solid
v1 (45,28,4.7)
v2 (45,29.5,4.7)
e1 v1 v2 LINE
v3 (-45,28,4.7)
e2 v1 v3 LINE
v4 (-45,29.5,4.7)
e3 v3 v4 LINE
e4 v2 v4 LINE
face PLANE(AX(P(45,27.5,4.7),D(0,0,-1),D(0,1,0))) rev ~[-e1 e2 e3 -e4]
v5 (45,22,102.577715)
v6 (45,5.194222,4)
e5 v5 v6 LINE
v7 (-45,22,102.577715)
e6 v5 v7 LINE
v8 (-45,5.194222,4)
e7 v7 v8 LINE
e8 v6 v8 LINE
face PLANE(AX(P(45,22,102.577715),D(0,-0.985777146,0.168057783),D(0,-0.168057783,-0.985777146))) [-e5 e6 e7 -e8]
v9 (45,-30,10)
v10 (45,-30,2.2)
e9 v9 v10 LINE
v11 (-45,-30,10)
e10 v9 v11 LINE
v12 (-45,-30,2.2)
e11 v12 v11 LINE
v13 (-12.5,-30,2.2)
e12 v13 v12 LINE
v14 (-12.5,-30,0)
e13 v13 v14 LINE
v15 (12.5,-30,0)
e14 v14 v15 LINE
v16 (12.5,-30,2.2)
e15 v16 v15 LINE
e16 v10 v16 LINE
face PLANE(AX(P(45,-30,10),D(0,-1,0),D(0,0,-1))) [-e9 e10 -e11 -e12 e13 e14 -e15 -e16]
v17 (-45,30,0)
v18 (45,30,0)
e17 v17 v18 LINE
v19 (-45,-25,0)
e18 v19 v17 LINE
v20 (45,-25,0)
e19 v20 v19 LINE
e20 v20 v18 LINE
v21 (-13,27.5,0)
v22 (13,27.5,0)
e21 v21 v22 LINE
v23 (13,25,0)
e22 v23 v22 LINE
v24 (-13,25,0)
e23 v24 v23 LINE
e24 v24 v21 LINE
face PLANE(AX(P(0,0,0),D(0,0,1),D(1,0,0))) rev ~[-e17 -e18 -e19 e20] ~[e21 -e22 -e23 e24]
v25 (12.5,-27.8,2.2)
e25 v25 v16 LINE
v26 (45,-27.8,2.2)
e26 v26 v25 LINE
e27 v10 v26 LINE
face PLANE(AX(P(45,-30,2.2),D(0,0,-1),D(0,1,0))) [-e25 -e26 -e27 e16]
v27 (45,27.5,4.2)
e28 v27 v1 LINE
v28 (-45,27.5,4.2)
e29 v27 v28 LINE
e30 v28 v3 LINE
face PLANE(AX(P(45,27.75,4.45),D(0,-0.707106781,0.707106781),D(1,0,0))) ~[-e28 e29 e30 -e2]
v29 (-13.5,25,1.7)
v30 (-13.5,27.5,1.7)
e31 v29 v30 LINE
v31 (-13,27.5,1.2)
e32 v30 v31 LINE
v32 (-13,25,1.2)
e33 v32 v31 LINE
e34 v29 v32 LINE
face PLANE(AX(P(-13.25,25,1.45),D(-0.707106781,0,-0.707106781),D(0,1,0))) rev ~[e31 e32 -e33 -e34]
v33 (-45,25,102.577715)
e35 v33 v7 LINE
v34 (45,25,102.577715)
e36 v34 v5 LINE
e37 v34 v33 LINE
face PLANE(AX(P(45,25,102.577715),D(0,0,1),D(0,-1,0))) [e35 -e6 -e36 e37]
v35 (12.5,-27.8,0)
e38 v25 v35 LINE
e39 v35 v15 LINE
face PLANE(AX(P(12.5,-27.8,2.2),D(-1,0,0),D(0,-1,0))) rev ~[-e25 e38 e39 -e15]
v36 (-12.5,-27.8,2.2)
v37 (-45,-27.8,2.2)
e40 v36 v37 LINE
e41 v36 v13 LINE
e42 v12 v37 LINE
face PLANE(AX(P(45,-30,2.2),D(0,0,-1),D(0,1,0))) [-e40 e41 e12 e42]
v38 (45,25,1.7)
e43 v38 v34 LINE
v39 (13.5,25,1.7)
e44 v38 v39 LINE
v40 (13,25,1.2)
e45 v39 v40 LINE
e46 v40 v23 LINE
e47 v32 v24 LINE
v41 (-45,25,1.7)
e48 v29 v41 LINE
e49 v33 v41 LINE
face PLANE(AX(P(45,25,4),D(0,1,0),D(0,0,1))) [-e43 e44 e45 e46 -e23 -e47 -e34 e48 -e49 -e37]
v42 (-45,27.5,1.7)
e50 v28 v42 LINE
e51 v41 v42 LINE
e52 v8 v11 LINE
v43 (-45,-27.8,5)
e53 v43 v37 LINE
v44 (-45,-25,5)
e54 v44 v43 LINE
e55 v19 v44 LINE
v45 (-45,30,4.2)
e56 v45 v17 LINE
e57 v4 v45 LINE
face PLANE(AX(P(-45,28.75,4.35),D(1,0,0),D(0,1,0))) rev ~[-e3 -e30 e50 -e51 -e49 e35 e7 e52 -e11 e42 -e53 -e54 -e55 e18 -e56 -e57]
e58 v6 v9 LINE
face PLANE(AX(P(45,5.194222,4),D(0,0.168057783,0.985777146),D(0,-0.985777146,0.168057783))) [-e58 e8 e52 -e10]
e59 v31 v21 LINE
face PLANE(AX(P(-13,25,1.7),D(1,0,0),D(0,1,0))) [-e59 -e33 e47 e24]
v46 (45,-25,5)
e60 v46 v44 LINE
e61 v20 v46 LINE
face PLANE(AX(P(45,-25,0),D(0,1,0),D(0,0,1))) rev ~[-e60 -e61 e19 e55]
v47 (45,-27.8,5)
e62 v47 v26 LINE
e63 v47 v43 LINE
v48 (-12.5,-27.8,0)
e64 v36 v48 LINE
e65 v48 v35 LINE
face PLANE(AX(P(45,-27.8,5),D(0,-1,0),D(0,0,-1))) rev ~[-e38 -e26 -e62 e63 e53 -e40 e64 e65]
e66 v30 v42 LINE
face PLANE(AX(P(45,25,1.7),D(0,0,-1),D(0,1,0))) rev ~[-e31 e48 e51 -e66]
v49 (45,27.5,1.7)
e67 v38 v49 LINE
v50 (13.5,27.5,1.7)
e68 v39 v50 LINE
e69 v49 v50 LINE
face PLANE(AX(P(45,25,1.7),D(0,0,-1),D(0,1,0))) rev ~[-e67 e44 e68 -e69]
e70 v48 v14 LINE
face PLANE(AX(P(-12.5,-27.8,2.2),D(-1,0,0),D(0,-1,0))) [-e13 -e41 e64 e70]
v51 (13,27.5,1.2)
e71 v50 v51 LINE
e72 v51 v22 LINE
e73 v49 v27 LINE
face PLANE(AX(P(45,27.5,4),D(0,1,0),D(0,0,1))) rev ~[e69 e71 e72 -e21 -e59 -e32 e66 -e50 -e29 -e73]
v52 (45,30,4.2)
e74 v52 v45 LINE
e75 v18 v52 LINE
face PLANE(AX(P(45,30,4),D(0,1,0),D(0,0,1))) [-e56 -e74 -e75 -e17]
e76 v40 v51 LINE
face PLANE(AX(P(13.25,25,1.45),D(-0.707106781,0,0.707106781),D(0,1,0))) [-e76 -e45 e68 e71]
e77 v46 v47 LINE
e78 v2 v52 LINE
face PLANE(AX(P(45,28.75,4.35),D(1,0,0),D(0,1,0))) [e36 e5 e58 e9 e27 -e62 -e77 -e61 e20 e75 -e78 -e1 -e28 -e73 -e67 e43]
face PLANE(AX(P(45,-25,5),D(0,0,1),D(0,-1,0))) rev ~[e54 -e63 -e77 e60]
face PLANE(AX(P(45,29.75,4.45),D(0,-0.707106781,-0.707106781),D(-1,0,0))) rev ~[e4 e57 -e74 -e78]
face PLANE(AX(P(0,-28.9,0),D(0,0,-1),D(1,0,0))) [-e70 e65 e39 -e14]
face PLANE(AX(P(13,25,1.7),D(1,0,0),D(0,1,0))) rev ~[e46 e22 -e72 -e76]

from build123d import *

# Parameters (mm, degrees)
F0_W      = 90
F0_H      = 60
F1_DEPTH  = 4
F3_DEPTH  = 90
F4_W      = 2.2
F4_H      = 2.2
F4_W_2    = 2.5
F4_H_2    = 2.3
F5_DEPTH  = 90
F4_H_3    = 0.7
F6_DEPTH  = 90
F7_W      = 25
F7_H      = 2.2
F8_DEPTH  = 2.2
F9_W      = 26
F9_H      = 2.5
F10_DEPTH = 1.7
F11_SIZE  = 0.5


with BuildPart() as f1:
    # F0 (on Top) → F1 (new body)
    with BuildSketch(Plane.XY):
        Rectangle(F0_W, F0_H)
    extrude(amount=F1_DEPTH)

    # F2 (on face) → F3 (join, through all)
    with BuildSketch(Plane.YZ.offset(45)):
        Polygon((22, 102.5777145975), (5.1942216862, 4), (25, 4), (25, 102.5777145975), align=None)
        Polygon((-30, 10), (-30, 4), (5.1942216862, 4), align=None)
    extrude(amount=-F3_DEPTH)

    # F4 (on face) → F5 (cut, through all)
    with BuildSketch(Plane.YZ.offset(45)):
        with Locations((-28.9, 1.1)):
            Rectangle(F4_W, F4_H)
        Polygon((-27.8, 2.2), (-27.8, 0), (-25, 0), (-25, 5), (-27.8, 5), align=None)
        with Locations((26.25, 2.85)):
            Rectangle(F4_W_2, F4_H_2)
    extrude(amount=-F5_DEPTH, mode=Mode.SUBTRACT)

    # F4 (on face) → F6 (join, through all)
    with BuildSketch(Plane.YZ.offset(45)):
        with Locations((28.75, 4.35)):
            Rectangle(F4_W_2, F4_H_3)
    extrude(amount=-F6_DEPTH)

    # F7 (on face) → F8 (join, through all)
    with BuildSketch(Plane(origin=(0, 0, 2.2), x_dir=(1, 0, 0), z_dir=(0, 0, -1))):
        with Locations((0, 28.9)):
            Rectangle(F7_W, F7_H)
    extrude(amount=F8_DEPTH)

    # F9 (on face) → F10 (cut, through all)
    with BuildSketch(Plane.XY.offset(1.7)):
        with Locations((0, 26.25)):
            Rectangle(F9_W, F9_H)
    extrude(amount=-F10_DEPTH, mode=Mode.SUBTRACT)

    # F11
    f11_edges = [f1.edges().sort_by_distance(p)[0] for p in [
        (0, 30, 4.7),
        (0, 27.5, 4.7),
        (-13, 26.25, 1.7),
        (13, 26.25, 1.7),
    ]]
    chamfer(f11_edges, length=F11_SIZE)


solid = f1.part
